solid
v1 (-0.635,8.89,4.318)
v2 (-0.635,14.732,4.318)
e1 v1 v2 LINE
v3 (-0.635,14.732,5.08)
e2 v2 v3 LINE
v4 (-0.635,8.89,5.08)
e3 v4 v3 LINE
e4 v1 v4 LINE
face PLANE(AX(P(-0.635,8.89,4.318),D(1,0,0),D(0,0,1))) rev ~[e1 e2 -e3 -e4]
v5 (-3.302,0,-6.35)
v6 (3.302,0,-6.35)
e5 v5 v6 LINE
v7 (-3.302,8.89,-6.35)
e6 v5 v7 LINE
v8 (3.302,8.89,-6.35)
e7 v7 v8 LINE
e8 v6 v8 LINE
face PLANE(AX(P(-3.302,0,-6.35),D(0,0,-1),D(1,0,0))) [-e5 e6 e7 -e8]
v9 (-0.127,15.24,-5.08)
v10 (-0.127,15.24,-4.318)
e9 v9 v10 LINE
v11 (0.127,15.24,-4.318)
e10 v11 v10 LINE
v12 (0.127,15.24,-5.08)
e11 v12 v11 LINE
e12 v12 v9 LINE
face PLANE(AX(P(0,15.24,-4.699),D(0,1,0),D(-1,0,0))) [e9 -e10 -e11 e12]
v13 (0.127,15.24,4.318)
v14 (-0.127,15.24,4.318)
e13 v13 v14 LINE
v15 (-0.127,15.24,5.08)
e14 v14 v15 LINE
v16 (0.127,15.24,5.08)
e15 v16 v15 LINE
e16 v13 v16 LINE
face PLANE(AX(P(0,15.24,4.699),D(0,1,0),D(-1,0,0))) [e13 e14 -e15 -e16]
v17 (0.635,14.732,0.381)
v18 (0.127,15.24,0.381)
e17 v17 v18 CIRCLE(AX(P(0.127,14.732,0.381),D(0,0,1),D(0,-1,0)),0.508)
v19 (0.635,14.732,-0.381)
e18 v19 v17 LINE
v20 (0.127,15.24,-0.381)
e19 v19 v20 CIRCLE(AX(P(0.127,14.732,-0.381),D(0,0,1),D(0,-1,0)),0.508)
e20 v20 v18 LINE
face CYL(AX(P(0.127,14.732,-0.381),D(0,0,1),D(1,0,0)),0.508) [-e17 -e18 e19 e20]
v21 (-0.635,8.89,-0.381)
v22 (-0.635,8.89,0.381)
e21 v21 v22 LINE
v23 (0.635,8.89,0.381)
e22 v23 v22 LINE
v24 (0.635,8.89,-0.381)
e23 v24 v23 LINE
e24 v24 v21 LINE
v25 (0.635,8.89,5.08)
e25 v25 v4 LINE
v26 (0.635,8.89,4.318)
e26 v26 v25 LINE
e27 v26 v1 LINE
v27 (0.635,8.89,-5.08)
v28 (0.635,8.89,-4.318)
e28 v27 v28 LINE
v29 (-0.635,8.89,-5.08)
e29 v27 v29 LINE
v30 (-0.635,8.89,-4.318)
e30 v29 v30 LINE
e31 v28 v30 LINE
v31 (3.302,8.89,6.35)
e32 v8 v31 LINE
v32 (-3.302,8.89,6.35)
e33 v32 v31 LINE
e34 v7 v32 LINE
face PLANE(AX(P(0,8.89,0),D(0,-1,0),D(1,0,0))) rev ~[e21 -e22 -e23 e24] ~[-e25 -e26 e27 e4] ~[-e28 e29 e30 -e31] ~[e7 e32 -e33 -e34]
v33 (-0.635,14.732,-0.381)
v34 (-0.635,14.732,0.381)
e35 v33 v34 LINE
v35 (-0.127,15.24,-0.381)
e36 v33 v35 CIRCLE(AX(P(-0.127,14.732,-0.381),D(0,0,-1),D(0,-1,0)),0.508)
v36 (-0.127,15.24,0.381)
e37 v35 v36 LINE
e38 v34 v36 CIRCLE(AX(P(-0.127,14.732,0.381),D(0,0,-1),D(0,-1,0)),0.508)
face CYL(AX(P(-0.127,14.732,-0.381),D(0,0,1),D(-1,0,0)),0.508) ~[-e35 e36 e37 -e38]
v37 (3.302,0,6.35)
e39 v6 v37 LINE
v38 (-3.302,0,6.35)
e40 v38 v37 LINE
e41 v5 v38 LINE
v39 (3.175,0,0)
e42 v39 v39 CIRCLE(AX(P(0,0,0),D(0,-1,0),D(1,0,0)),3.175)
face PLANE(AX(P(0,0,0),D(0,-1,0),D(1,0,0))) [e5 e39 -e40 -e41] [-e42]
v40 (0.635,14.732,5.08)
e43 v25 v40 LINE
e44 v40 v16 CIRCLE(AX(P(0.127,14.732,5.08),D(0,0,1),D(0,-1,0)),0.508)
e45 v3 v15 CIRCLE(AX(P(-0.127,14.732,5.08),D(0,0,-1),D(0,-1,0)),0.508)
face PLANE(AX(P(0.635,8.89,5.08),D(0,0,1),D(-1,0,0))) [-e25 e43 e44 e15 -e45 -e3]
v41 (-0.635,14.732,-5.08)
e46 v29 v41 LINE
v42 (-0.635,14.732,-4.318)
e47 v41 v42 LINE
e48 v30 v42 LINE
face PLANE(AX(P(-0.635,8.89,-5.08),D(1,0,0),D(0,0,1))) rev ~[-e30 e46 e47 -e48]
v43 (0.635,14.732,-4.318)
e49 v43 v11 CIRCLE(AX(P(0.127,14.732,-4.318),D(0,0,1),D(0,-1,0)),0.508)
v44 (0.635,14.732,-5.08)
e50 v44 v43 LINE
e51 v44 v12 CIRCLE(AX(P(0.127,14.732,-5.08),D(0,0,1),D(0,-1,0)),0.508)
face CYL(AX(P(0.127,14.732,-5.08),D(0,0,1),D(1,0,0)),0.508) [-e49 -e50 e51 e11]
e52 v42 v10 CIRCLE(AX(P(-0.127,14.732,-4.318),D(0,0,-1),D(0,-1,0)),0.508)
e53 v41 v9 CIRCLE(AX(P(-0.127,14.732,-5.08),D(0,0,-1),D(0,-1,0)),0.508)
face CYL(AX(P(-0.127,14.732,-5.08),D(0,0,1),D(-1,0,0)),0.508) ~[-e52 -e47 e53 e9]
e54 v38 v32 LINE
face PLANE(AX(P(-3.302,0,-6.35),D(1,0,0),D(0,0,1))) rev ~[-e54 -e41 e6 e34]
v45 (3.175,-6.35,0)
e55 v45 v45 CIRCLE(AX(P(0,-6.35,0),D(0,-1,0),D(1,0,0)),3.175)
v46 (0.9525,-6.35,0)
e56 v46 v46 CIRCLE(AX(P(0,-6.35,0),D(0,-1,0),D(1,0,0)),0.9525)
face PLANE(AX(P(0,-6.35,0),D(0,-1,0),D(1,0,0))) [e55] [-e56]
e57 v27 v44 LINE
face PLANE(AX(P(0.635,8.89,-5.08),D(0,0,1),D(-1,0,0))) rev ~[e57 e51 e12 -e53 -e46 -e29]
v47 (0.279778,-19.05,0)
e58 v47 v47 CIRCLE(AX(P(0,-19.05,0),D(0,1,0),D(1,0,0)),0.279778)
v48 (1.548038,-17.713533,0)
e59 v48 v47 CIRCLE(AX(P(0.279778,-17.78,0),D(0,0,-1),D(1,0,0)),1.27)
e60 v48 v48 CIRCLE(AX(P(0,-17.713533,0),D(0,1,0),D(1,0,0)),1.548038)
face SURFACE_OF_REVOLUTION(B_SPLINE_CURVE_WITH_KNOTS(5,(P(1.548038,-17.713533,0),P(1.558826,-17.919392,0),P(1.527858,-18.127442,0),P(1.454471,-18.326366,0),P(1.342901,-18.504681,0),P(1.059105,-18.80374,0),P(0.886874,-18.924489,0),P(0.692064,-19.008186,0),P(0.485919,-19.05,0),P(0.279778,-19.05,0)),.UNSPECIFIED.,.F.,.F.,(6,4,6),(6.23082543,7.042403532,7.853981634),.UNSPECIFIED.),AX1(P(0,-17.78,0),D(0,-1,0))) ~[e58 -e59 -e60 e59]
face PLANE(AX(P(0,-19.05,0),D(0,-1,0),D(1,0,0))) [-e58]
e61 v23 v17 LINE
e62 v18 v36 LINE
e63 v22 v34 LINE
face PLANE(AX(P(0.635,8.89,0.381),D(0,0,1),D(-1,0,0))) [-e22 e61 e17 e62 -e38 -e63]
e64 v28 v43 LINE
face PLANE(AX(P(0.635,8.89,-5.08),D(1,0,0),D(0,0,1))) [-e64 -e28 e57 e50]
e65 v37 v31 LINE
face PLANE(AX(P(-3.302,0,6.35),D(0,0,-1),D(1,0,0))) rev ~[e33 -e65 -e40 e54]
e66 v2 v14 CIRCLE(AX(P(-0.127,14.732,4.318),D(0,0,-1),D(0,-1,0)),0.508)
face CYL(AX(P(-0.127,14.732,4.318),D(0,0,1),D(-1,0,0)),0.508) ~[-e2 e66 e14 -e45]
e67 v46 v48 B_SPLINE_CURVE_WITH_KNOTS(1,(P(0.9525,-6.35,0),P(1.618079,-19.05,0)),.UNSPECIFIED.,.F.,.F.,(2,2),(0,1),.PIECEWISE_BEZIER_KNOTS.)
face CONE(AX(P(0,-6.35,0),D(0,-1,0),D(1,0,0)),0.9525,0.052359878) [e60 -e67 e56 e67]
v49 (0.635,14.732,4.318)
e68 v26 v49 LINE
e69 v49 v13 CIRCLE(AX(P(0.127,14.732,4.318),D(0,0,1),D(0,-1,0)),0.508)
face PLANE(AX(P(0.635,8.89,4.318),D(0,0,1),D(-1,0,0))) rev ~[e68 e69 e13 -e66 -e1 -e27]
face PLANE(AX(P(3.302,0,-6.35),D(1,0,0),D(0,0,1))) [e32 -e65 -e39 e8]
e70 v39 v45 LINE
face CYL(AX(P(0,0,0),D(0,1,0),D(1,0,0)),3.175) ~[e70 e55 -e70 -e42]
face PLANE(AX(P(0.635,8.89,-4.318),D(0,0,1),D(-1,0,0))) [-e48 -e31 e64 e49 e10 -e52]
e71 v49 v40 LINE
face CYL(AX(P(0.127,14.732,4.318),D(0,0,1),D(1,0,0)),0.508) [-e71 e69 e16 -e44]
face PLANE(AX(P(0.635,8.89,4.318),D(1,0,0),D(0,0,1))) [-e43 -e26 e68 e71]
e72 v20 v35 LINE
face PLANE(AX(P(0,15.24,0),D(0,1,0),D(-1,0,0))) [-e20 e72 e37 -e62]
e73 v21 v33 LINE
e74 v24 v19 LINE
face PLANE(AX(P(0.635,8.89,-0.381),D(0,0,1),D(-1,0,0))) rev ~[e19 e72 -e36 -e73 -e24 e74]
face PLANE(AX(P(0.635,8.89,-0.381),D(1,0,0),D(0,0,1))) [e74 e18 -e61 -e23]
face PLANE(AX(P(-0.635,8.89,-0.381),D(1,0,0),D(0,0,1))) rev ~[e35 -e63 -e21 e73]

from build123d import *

# Parameters (mm, degrees)
F0_W     = 6.604
F0_H     = 12.7
F0_R     = 3.175
F1_DEPTH = 8.89
F2_DEPTH = 6.35
F3_R     = 0.9525
F4_DEPTH = 12.7
F4_TAPER = -3
F5_R     = 1.27
F6_W     = 1.27
F6_H     = 0.762
F7_DEPTH = 6.35
F8_R     = 0.508


with BuildPart() as f1:
    # F0 (on Front) → F1 (new body)
    with BuildSketch(Plane.XZ):
        Rectangle(F0_W, F0_H)
        Circle(F0_R, mode=Mode.SUBTRACT)
        Circle(F0_R)
    extrude(amount=-F1_DEPTH)

    # F0 (on Front) → F2 (join)
    with BuildSketch(Plane.XZ):
        Circle(F0_R)
    extrude(amount=F2_DEPTH)

    # F3 (on face) → F4 (join)
    with BuildSketch(Plane.XZ.offset(6.35)):
        Circle(F3_R)
    extrude(amount=F4_DEPTH, taper=F4_TAPER)

    # F5
    f5_edges = [f1.edges().sort_by_distance(p)[0] for p in [
        (-1.618079, -19.05, 0),
    ]]
    fillet(f5_edges, radius=F5_R)

    # F6 (on face) → F7 (join)
    with BuildSketch(Plane(origin=(0, 8.89, 0), x_dir=(-1, 0, 0), z_dir=(0, 1, 0))):
        with Locations((0, 4.699)):
            Rectangle(F6_W, F6_H)
        Rectangle(F6_W, F6_H)
        with Locations((0, -4.699)):
            Rectangle(F6_W, F6_H)
    extrude(amount=F7_DEPTH)

    # F8
    f8_edges = [f1.edges().sort_by_distance(p)[0] for p in [
        (0.635, 15.24, 4.699),
        (-0.635, 15.24, 4.699),
        (0.635, 15.24, 0),
        (-0.635, 15.24, 0),
        (0.635, 15.24, -4.699),
        (-0.635, 15.24, -4.699),
    ]]
    fillet(f8_edges, radius=F8_R)


solid = f1.part
